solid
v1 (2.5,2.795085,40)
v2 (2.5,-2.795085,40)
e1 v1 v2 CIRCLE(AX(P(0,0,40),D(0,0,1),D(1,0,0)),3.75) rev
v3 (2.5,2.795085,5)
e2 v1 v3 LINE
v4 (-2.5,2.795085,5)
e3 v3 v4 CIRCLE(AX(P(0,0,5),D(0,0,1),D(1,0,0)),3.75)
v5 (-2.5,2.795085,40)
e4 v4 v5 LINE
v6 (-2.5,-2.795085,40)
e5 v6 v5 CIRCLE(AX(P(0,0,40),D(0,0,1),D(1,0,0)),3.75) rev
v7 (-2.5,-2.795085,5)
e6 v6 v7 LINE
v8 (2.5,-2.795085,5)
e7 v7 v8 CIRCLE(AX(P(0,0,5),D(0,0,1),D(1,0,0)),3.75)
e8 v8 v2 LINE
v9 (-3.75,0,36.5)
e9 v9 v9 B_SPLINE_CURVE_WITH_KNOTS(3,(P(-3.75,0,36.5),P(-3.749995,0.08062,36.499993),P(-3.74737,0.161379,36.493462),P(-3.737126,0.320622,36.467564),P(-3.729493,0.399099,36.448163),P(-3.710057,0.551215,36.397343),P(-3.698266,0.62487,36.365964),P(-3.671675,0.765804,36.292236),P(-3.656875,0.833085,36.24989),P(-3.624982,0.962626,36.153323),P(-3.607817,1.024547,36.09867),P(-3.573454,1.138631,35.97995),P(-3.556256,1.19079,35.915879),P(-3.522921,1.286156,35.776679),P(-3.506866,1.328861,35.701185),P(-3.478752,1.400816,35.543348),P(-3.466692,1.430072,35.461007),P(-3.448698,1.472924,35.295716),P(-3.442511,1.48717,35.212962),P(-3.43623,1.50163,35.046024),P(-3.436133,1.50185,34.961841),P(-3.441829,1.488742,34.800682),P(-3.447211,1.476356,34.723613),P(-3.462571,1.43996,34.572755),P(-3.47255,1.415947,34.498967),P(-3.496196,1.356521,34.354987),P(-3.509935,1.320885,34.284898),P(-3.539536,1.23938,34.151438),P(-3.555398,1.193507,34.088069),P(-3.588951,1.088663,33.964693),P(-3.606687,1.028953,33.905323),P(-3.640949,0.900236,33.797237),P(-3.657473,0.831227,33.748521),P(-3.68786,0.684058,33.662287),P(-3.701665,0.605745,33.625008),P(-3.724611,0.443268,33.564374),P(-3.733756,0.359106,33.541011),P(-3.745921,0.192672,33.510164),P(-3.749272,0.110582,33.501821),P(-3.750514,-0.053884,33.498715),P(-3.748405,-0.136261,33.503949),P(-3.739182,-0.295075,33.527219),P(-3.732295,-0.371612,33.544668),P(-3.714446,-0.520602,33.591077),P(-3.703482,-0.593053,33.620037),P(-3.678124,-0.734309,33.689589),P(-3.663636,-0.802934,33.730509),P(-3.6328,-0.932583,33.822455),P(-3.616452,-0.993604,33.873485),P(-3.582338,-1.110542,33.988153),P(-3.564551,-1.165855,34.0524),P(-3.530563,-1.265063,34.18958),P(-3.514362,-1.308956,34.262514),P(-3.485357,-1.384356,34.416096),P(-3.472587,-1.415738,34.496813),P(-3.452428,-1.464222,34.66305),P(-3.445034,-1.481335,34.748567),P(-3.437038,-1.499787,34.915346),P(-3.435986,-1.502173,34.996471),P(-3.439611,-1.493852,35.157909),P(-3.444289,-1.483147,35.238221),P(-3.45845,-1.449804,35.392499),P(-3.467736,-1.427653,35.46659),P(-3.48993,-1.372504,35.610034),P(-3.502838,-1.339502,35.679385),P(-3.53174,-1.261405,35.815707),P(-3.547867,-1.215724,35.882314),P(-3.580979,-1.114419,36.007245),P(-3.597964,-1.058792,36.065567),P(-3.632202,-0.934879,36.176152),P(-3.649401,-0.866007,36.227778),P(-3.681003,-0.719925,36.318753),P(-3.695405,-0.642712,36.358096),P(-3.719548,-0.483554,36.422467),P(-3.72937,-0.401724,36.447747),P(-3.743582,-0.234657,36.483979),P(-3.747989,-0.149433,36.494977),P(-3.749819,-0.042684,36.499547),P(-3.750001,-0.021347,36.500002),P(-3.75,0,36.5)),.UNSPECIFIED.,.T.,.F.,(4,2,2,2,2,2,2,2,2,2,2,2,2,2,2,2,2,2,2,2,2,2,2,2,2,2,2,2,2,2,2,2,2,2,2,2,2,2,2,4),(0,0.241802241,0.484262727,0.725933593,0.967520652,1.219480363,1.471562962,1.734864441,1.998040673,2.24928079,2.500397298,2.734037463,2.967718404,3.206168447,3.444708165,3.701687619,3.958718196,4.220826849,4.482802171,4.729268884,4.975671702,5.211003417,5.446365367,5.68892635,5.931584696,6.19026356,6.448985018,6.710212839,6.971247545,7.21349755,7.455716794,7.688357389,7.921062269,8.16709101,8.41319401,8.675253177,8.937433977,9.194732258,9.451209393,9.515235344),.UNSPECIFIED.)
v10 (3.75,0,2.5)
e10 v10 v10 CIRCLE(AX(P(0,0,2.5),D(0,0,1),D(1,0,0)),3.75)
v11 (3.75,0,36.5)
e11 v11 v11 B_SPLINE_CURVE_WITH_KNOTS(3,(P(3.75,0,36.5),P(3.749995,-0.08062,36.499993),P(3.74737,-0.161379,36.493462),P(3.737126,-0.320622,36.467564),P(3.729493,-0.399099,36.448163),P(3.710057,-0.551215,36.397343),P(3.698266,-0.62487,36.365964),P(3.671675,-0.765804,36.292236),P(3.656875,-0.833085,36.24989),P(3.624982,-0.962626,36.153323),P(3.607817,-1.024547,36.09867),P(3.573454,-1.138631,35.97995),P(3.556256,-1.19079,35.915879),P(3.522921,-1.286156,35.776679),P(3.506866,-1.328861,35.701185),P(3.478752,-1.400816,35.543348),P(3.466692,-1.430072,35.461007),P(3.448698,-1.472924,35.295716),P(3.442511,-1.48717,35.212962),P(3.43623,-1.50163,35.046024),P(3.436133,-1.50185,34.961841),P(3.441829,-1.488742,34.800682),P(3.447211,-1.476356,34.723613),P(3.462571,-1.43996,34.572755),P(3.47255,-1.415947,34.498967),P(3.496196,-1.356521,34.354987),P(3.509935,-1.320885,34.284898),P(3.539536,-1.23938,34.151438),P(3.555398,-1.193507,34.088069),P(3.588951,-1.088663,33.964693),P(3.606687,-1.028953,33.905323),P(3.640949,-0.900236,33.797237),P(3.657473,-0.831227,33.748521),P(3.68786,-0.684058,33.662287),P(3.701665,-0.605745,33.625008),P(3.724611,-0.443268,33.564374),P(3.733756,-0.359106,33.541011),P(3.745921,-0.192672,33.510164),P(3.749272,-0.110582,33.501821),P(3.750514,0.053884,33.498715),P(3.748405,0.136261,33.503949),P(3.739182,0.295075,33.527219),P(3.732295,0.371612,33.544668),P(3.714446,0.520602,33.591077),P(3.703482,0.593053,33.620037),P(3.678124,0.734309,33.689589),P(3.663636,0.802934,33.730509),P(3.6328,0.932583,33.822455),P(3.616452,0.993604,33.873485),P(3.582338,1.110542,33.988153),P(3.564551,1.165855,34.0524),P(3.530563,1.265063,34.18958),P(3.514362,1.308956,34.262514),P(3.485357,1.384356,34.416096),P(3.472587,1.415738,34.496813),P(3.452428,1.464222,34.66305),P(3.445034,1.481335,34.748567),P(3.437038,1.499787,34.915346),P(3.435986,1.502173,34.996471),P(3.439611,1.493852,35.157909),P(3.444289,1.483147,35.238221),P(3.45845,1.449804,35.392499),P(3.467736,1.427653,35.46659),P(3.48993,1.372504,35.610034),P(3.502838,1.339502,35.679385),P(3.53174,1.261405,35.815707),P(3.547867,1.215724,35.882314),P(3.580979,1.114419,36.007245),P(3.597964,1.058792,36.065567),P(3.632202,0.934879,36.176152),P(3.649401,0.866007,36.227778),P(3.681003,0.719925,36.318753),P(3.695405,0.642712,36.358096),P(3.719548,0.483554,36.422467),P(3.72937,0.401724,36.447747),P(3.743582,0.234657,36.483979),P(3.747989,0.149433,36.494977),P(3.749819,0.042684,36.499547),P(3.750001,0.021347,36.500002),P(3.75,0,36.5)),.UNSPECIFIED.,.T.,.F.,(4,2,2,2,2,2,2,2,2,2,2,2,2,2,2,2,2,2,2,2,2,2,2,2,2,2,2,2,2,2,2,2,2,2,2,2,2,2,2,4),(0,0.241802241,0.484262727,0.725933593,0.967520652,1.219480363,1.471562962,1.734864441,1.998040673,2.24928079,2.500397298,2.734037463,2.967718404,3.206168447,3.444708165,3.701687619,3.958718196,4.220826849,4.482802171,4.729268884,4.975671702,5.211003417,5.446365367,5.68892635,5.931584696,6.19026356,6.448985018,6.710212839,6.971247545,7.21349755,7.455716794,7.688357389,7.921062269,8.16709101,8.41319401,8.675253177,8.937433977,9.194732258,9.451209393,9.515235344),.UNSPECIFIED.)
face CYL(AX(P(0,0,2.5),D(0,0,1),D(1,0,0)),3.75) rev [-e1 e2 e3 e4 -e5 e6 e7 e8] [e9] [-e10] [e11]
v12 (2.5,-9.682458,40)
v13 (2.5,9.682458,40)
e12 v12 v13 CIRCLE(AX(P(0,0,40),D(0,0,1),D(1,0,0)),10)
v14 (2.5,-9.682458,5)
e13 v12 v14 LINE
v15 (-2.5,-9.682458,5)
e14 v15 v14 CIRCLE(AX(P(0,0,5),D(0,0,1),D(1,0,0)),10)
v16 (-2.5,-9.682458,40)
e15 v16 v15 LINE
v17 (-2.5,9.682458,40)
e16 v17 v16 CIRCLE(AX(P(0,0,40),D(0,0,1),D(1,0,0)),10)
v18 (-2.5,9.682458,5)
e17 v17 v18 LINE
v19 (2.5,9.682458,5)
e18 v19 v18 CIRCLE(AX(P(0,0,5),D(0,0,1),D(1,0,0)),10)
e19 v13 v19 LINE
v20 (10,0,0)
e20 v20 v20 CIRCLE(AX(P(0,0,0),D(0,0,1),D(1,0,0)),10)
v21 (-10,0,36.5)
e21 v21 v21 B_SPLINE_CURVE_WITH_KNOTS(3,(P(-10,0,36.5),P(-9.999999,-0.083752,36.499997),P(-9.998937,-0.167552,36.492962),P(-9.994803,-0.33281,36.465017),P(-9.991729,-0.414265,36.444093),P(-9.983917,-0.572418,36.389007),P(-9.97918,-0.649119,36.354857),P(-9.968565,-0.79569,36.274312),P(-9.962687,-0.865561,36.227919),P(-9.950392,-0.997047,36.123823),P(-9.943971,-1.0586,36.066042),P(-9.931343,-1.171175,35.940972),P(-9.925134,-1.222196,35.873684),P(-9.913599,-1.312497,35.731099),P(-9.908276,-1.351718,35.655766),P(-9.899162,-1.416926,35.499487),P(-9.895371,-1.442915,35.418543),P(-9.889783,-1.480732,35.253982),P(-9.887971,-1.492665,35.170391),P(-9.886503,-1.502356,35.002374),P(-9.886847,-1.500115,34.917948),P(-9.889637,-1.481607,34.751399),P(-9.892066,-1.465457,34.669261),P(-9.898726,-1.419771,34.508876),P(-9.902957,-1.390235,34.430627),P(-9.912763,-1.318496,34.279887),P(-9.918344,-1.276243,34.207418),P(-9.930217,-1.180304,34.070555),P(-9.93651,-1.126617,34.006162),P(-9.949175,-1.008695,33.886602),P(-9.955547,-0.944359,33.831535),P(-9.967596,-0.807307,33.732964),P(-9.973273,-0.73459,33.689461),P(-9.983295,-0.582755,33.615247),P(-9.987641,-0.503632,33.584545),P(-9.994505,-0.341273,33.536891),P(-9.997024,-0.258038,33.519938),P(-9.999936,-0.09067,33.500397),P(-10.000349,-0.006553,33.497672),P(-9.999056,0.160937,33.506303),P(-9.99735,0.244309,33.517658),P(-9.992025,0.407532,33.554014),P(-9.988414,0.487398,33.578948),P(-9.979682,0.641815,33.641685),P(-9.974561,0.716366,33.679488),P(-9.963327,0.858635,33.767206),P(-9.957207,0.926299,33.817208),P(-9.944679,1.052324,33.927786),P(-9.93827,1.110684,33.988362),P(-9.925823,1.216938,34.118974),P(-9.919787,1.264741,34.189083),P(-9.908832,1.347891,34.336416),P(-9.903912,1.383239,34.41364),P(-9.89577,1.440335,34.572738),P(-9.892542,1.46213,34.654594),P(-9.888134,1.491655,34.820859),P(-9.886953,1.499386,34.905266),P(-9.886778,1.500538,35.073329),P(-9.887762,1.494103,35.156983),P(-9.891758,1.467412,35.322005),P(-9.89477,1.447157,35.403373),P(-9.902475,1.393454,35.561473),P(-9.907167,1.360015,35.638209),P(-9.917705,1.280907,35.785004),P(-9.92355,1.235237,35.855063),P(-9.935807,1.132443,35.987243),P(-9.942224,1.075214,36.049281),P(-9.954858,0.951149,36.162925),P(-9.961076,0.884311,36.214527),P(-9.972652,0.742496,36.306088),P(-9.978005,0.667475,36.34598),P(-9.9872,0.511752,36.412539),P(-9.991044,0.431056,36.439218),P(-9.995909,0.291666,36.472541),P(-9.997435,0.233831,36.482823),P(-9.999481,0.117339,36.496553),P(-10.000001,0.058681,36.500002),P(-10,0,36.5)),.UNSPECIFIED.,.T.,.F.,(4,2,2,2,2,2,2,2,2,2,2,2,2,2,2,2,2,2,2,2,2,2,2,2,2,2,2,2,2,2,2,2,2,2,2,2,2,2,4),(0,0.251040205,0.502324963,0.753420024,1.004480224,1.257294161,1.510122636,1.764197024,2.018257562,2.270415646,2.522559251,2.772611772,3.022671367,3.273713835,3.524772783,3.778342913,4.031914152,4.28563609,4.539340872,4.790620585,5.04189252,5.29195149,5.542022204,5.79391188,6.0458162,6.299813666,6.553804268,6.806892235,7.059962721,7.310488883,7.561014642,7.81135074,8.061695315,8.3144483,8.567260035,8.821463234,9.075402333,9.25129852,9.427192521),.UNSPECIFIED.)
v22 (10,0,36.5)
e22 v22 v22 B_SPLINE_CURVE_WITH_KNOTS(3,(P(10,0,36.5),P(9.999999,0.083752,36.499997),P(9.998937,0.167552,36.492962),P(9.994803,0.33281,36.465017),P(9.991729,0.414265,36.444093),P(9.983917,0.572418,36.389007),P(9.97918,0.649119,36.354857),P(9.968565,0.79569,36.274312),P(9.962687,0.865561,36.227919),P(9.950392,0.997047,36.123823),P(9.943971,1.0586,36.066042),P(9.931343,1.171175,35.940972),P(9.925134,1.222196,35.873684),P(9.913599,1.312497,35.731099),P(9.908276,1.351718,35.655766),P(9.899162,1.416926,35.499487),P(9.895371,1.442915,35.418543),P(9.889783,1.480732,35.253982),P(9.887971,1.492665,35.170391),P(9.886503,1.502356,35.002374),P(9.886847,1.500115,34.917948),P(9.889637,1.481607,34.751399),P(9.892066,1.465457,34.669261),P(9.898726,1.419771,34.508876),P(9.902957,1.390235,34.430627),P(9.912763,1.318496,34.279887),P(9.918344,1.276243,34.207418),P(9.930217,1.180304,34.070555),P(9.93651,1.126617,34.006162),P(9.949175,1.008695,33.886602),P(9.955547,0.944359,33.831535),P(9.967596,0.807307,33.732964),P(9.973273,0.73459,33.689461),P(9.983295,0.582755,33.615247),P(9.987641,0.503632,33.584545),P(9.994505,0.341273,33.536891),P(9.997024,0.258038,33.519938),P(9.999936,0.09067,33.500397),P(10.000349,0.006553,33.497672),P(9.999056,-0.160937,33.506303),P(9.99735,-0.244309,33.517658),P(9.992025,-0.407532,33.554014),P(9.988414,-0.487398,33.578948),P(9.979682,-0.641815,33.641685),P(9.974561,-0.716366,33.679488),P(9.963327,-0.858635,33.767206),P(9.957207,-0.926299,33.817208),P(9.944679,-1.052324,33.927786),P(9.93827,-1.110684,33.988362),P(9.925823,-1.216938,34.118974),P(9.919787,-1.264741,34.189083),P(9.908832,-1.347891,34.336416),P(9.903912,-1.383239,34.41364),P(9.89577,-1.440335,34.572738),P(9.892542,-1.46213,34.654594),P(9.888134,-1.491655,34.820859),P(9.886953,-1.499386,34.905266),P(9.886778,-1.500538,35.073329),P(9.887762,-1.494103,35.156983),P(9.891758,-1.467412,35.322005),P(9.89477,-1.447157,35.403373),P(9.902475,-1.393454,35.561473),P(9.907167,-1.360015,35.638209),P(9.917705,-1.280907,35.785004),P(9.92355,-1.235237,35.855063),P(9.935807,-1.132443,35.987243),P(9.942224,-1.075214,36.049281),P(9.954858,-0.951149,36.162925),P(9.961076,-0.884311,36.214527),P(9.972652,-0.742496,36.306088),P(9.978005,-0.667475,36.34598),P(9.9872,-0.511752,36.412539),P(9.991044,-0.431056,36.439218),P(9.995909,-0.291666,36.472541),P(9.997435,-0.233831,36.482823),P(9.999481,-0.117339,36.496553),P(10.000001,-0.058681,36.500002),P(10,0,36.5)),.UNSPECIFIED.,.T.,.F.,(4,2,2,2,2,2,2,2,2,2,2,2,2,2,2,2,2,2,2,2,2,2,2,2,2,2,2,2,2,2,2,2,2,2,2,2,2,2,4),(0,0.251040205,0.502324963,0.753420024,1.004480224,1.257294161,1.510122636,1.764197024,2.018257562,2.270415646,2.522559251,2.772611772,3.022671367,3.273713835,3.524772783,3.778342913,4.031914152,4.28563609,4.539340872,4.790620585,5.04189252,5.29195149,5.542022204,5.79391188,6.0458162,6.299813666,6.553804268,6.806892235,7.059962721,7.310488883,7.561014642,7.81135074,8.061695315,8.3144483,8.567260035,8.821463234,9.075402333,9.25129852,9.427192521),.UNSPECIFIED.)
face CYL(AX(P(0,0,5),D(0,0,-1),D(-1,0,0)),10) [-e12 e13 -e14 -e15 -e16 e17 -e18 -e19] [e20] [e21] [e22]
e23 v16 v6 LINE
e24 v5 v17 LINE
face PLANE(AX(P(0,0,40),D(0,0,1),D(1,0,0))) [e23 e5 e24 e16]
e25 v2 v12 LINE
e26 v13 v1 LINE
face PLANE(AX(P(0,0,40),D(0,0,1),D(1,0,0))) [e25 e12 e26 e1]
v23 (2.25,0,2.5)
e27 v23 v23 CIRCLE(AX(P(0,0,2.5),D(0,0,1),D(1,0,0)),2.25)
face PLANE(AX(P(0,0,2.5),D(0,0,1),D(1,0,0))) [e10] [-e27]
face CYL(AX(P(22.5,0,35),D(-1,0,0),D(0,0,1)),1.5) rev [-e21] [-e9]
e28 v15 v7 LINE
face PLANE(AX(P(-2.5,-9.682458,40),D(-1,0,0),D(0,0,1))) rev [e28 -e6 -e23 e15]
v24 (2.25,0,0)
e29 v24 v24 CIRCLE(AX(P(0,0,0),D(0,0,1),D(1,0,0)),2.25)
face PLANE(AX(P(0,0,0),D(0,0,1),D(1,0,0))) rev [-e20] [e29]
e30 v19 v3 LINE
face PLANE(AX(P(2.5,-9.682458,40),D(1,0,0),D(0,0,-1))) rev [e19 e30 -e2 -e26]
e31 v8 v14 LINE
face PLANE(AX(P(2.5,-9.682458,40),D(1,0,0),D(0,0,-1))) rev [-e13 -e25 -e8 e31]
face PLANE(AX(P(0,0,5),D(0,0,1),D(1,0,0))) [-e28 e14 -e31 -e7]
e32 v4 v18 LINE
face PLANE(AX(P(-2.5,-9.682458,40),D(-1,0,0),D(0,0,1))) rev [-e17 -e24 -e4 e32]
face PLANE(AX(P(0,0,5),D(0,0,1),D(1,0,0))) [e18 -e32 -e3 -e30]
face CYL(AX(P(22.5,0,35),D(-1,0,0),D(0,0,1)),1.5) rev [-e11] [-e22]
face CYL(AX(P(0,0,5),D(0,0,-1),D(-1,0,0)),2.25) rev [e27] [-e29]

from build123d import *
from build123d.topology import SkipClean

# Parameters (mm, degrees)
CROQUIS1_R              = 10
CROQUIS1_R_2            = 2.25
SALIENTE_EXTRUIR1_DEPTH = 5
SALIENTE_EXTRUIR2_DEPTH = 35
CROQUIS3_R              = 1.5
CORTAR_EXTRUIR1_DEPTH   = 20
CROQUIS4_R              = 3.75
CORTAR_EXTRUIR2_DEPTH   = 2.5
CORTAR_EXTRUIR4_START   = 49
CROQUIS6_R              = 3.75
CORTAR_EXTRUIR4_DEPTH   = 49


with BuildPart() as part:
    # Croquis1 → Saliente-Extruir1 (new body)
    with BuildSketch(Plane.XY):
        Circle(CROQUIS1_R)
        Circle(CROQUIS1_R_2, mode=Mode.SUBTRACT)
    extrude(amount=SALIENTE_EXTRUIR1_DEPTH)

    # Croquis2 → Saliente-Extruir2 (add)
    with SkipClean():  # the faces are left unmerged after this step: merging them gives an invalid solid
        with BuildSketch(Plane.XY.offset(5)):
            with BuildLine():
                Line((-2.5, -9.682458366), (-2.5, 9.682458366))
                ThreePointArc((-2.5, 9.682458366), (-10, 0), (-2.5, -9.682458366))
            make_face()
            with BuildLine():
                Line((2.5, -9.682458366), (2.5, 9.682458366))
                ThreePointArc((2.5, 9.682458366), (10, 0), (2.5, -9.682458366))
            make_face()
        extrude(amount=SALIENTE_EXTRUIR2_DEPTH)
    add(part.part.scale(1), mode=Mode.REPLACE)  # the faces are merged on a copy

    # Croquis3 → Cortar-Extruir1 (cut, symmetric)
    with BuildSketch(Plane.ZY.offset(-2.5)):
        with Locations((35, 0)):
            Circle(CROQUIS3_R)
    extrude(amount=CORTAR_EXTRUIR1_DEPTH, both=True, mode=Mode.SUBTRACT)

    # Croquis4 → Cortar-Extruir2 (cut)
    with BuildSketch(Plane.XY.offset(5)):
        Circle(CROQUIS4_R)
    extrude(amount=-CORTAR_EXTRUIR2_DEPTH, mode=Mode.SUBTRACT)

    # Croquis6 → Cortar-Extruir4 (cut)
    with SkipClean():  # the faces are left unmerged after this step: merging them gives an invalid solid
        with BuildSketch(Plane.XY.offset(2.5).offset(CORTAR_EXTRUIR4_START)):
            Circle(CROQUIS6_R)
        extrude(amount=-CORTAR_EXTRUIR4_DEPTH, mode=Mode.SUBTRACT)


solid = part.part
